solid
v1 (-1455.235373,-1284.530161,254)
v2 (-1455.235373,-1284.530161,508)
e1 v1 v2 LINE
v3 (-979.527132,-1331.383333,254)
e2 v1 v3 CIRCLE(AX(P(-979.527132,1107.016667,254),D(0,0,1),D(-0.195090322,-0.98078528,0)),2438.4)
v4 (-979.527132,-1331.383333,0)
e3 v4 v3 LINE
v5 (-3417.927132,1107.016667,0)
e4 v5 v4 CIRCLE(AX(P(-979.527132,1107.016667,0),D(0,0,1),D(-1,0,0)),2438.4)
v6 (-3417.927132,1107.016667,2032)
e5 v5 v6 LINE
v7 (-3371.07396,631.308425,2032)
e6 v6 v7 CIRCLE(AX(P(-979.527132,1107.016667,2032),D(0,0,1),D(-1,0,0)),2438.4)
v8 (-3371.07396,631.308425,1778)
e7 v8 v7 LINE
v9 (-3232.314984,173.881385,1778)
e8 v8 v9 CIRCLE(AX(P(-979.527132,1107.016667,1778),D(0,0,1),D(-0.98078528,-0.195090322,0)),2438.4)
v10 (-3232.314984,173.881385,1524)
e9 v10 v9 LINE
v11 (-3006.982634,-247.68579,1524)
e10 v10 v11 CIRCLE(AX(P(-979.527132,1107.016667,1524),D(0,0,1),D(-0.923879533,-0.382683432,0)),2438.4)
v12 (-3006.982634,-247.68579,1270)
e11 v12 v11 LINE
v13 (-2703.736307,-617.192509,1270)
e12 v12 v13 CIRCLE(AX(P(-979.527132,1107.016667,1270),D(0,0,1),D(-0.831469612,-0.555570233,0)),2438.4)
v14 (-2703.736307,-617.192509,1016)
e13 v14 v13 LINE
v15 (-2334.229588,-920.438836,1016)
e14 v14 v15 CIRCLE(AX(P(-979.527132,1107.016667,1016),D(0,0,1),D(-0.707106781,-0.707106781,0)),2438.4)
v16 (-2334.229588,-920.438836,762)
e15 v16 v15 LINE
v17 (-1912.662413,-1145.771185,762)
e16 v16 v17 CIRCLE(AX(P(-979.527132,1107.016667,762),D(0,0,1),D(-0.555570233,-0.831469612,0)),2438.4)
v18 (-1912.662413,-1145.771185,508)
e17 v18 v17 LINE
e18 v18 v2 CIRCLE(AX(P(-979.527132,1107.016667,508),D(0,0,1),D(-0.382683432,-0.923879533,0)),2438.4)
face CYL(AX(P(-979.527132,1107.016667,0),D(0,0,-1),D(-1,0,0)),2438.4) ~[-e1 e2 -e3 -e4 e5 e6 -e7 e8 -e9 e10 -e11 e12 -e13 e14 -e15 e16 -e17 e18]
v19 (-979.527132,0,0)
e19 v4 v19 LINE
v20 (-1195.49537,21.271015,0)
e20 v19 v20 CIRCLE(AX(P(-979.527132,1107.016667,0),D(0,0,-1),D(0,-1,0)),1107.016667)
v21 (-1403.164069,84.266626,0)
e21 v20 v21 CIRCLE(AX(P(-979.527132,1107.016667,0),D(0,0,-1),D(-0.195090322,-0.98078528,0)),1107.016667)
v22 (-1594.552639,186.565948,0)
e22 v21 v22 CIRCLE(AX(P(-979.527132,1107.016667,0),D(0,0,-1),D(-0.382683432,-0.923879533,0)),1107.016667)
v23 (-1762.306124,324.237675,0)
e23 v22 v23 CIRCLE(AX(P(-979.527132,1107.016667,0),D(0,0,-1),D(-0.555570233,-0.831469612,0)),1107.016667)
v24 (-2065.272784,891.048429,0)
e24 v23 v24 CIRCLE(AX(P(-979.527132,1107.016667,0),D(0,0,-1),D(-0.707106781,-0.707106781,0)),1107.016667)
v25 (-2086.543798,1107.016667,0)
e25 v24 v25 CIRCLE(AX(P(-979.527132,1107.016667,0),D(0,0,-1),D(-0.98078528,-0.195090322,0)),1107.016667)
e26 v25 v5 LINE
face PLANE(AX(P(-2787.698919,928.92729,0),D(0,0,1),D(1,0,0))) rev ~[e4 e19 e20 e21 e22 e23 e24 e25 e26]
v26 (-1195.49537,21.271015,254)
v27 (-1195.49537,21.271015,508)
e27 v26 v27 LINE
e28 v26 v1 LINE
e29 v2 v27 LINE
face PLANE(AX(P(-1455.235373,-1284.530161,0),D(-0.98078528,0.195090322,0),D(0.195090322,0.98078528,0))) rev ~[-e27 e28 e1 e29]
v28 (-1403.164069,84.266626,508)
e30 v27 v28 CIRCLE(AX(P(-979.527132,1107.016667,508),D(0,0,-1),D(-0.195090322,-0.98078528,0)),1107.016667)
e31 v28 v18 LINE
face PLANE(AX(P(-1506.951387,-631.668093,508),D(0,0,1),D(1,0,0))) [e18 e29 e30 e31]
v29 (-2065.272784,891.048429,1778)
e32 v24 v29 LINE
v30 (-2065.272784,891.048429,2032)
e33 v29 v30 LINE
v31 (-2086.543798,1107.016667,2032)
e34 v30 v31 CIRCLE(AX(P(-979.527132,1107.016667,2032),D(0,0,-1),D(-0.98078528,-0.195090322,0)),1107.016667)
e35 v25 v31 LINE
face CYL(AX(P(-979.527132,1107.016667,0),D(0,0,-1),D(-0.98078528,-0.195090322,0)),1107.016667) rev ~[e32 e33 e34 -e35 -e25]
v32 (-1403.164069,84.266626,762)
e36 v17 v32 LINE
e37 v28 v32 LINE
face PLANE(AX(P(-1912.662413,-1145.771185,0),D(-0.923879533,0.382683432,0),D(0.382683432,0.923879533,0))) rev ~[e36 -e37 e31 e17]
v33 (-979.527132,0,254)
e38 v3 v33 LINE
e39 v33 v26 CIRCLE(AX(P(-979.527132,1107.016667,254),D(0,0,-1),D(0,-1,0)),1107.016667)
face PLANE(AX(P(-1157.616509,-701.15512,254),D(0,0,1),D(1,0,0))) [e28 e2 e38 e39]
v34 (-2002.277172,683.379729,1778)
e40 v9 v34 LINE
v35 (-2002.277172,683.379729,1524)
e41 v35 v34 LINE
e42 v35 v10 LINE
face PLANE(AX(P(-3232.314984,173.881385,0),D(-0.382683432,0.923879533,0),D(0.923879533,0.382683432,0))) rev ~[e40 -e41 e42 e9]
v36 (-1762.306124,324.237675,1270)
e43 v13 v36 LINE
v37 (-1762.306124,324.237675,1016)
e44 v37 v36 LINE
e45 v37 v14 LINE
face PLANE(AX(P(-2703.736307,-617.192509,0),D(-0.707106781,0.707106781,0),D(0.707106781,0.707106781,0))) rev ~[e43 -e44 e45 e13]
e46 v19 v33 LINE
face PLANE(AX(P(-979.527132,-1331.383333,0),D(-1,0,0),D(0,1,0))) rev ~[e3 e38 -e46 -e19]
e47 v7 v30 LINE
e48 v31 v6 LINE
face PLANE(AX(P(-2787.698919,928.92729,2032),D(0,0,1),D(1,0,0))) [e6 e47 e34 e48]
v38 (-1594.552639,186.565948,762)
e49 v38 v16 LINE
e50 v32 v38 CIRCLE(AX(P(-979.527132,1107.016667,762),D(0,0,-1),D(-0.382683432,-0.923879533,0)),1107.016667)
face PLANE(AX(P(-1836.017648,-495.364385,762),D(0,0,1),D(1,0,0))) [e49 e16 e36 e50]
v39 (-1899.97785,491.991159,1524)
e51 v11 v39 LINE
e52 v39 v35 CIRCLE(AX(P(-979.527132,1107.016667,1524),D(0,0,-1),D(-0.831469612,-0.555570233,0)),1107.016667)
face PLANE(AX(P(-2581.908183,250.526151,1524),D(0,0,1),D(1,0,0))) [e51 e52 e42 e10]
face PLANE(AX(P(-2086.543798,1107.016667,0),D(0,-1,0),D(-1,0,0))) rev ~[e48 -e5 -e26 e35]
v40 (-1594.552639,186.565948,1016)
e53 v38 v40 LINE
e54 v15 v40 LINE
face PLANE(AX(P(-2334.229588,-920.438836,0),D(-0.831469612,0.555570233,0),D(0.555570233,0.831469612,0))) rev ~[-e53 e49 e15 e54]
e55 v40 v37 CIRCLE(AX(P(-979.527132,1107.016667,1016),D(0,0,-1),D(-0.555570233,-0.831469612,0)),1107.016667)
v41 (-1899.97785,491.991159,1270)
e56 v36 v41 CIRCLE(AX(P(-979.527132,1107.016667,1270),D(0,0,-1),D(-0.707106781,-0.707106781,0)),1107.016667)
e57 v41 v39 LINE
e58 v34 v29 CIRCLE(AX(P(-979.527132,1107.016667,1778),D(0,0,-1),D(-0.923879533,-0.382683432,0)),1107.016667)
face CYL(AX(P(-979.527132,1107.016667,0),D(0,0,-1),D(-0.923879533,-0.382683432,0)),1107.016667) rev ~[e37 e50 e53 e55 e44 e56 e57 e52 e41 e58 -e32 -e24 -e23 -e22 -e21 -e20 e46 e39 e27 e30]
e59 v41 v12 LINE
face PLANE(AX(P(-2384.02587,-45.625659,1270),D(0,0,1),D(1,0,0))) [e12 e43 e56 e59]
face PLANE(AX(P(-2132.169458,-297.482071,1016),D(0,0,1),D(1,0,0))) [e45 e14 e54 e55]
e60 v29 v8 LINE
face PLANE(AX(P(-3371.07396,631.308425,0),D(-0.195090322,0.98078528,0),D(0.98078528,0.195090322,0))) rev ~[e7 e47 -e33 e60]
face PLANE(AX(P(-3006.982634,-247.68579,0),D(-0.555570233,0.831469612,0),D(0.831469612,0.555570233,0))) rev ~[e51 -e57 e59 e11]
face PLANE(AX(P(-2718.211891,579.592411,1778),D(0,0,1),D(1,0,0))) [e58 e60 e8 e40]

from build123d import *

# Parameters (mm, degrees)
F10_DEPTH = 254
F11_DEPTH = 508
F12_DEPTH = 762
F13_DEPTH = 1016
F14_DEPTH = 1270
F15_DEPTH = 1524
F16_DEPTH = 1778
F17_DEPTH = 2032


# Not quite as in the source:
# - a variable given as a bare number and used for a length is read in inches; the dataset says mm whatever the document's units were


with BuildPart() as f10:
    # F2 (on Top) → F10 (new body)
    with BuildSketch(Plane.XY):
        with BuildLine():
            Line((-979.52713178, -1331.3833333333), (-979.52713178, 0))
            ThreePointArc((-979.52713178, 0), (-1088.0337397438, 5.3305878284), (-1195.4953697572, 21.271014839))
            Line((-1195.4953697572, 21.271014839), (-1455.2353729841, -1284.5301610686))
            ThreePointArc((-1455.2353729841, -1284.5301610686), (-1218.5321267596, -1319.6417708508), (-979.52713178, -1331.3833333333))
        make_face()
    extrude(amount=F10_DEPTH)

    # F3 (on Top) → F11 (join)
    with BuildSketch(Plane.XY):
        with BuildLine():
            Line((-1455.2353729841, -1284.5301610686), (-1195.4953697572, 21.271014839))
            ThreePointArc((-1195.4953697572, 21.271014839), (-1300.8771075786, 47.6677660055), (-1403.1640694653, 84.2666261845))
            Line((-1403.1640694653, 84.2666261845), (-1912.662413259, -1145.7711854089))
            ThreePointArc((-1912.662413259, -1145.7711854089), (-1687.3572887973, -1226.3866479828), (-1455.2353729841, -1284.5301610686))
        make_face()
    extrude(amount=F11_DEPTH)

    # F4 (on Top) → F12 (join)
    with BuildSketch(Plane.XY):
        with BuildLine():
            Line((-1912.662413259, -1145.7711854089), (-1403.1640694653, 84.2666261845))
            ThreePointArc((-1403.1640694653, 84.2666261845), (-1501.3711760586, 130.7151283453), (-1594.5526392366, 186.5659480209))
            Line((-1594.5526392366, 186.5659480209), (-2334.229587975, -920.4388359719))
            ThreePointArc((-2334.229587975, -920.4388359719), (-2128.9809348565, -1043.4601443204), (-1912.662413259, -1145.7711854089))
        make_face()
    extrude(amount=F12_DEPTH)

    # F5 (on Top) → F13 (join)
    with BuildSketch(Plane.XY):
        with BuildLine():
            Line((-2334.229587975, -920.4388359719), (-1594.5526392366, 186.5659480209))
            ThreePointArc((-1594.5526392366, 186.5659480209), (-1681.8110705705, 251.2812112866), (-1762.3061236665, 324.2376747801))
            Line((-1762.3061236665, 324.2376747801), (-2703.7363070253, -617.1925085786))
            ThreePointArc((-2703.7363070253, -617.1925085786), (-2526.4317158846, -777.892022813), (-2334.229587975, -920.4388359719))
        make_face()
    extrude(amount=F13_DEPTH)

    # F6 (on Top) → F14 (join)
    with BuildSketch(Plane.XY):
        with BuildLine():
            Line((-2703.7363070253, -617.1925085786), (-1762.3061236665, 324.2376747801))
            ThreePointArc((-1762.3061236665, 324.2376747801), (-1835.2625871601, 404.7327278761), (-1899.9778504258, 491.9911592101))
            Line((-1899.9778504258, 491.9911592101), (-3006.9826344185, -247.6857895283))
            ThreePointArc((-3006.9826344185, -247.6857895283), (-2864.4358212597, -439.887917438), (-2703.7363070253, -617.1925085786))
        make_face()
    extrude(amount=F14_DEPTH)

    # F7 (on Top) → F15 (join)
    with BuildSketch(Plane.XY):
        with BuildLine():
            Line((-3006.9826344185, -247.6857895283), (-1899.9778504258, 491.9911592101))
            ThreePointArc((-1899.9778504258, 491.9911592101), (-1955.8286701014, 585.172622388), (-2002.2771722622, 683.3797289813))
            Line((-2002.2771722622, 683.3797289813), (-3232.3149838555, 173.8813851876))
            ThreePointArc((-3232.3149838555, 173.8813851876), (-3130.003942767, -42.4371364098), (-3006.9826344185, -247.6857895283))
        make_face()
    extrude(amount=F15_DEPTH)

    # F8 (on Top) → F16 (join)
    with BuildSketch(Plane.XY):
        with BuildLine():
            Line((-3232.3149838555, 173.8813851876), (-2002.2771722622, 683.3797289813))
            ThreePointArc((-2002.2771722622, 683.3797289813), (-2038.8760324411, 785.666690868), (-2065.2727836077, 891.0484286894))
            Line((-2065.2727836077, 891.0484286894), (-3371.0739595152, 631.3084254625))
            ThreePointArc((-3371.0739595152, 631.3084254625), (-3312.9304464294, 399.1865096494), (-3232.3149838555, 173.8813851876))
        make_face()
    extrude(amount=F16_DEPTH)

    # F9 (on Top) → F17 (join)
    with BuildSketch(Plane.XY):
        with BuildLine():
            Line((-3371.0739595152, 631.3084254625), (-2065.2727836077, 891.0484286894))
            ThreePointArc((-2065.2727836077, 891.0484286894), (-2081.2132106182, 998.5100587028), (-2086.5437984467, 1107.0166666667))
            Line((-2086.5437984467, 1107.0166666667), (-3417.92713178, 1107.0166666667))
            ThreePointArc((-3417.92713178, 1107.0166666667), (-3406.1855692975, 868.0116716871), (-3371.0739595152, 631.3084254625))
        make_face()
    extrude(amount=F17_DEPTH)


solid = f10.part
